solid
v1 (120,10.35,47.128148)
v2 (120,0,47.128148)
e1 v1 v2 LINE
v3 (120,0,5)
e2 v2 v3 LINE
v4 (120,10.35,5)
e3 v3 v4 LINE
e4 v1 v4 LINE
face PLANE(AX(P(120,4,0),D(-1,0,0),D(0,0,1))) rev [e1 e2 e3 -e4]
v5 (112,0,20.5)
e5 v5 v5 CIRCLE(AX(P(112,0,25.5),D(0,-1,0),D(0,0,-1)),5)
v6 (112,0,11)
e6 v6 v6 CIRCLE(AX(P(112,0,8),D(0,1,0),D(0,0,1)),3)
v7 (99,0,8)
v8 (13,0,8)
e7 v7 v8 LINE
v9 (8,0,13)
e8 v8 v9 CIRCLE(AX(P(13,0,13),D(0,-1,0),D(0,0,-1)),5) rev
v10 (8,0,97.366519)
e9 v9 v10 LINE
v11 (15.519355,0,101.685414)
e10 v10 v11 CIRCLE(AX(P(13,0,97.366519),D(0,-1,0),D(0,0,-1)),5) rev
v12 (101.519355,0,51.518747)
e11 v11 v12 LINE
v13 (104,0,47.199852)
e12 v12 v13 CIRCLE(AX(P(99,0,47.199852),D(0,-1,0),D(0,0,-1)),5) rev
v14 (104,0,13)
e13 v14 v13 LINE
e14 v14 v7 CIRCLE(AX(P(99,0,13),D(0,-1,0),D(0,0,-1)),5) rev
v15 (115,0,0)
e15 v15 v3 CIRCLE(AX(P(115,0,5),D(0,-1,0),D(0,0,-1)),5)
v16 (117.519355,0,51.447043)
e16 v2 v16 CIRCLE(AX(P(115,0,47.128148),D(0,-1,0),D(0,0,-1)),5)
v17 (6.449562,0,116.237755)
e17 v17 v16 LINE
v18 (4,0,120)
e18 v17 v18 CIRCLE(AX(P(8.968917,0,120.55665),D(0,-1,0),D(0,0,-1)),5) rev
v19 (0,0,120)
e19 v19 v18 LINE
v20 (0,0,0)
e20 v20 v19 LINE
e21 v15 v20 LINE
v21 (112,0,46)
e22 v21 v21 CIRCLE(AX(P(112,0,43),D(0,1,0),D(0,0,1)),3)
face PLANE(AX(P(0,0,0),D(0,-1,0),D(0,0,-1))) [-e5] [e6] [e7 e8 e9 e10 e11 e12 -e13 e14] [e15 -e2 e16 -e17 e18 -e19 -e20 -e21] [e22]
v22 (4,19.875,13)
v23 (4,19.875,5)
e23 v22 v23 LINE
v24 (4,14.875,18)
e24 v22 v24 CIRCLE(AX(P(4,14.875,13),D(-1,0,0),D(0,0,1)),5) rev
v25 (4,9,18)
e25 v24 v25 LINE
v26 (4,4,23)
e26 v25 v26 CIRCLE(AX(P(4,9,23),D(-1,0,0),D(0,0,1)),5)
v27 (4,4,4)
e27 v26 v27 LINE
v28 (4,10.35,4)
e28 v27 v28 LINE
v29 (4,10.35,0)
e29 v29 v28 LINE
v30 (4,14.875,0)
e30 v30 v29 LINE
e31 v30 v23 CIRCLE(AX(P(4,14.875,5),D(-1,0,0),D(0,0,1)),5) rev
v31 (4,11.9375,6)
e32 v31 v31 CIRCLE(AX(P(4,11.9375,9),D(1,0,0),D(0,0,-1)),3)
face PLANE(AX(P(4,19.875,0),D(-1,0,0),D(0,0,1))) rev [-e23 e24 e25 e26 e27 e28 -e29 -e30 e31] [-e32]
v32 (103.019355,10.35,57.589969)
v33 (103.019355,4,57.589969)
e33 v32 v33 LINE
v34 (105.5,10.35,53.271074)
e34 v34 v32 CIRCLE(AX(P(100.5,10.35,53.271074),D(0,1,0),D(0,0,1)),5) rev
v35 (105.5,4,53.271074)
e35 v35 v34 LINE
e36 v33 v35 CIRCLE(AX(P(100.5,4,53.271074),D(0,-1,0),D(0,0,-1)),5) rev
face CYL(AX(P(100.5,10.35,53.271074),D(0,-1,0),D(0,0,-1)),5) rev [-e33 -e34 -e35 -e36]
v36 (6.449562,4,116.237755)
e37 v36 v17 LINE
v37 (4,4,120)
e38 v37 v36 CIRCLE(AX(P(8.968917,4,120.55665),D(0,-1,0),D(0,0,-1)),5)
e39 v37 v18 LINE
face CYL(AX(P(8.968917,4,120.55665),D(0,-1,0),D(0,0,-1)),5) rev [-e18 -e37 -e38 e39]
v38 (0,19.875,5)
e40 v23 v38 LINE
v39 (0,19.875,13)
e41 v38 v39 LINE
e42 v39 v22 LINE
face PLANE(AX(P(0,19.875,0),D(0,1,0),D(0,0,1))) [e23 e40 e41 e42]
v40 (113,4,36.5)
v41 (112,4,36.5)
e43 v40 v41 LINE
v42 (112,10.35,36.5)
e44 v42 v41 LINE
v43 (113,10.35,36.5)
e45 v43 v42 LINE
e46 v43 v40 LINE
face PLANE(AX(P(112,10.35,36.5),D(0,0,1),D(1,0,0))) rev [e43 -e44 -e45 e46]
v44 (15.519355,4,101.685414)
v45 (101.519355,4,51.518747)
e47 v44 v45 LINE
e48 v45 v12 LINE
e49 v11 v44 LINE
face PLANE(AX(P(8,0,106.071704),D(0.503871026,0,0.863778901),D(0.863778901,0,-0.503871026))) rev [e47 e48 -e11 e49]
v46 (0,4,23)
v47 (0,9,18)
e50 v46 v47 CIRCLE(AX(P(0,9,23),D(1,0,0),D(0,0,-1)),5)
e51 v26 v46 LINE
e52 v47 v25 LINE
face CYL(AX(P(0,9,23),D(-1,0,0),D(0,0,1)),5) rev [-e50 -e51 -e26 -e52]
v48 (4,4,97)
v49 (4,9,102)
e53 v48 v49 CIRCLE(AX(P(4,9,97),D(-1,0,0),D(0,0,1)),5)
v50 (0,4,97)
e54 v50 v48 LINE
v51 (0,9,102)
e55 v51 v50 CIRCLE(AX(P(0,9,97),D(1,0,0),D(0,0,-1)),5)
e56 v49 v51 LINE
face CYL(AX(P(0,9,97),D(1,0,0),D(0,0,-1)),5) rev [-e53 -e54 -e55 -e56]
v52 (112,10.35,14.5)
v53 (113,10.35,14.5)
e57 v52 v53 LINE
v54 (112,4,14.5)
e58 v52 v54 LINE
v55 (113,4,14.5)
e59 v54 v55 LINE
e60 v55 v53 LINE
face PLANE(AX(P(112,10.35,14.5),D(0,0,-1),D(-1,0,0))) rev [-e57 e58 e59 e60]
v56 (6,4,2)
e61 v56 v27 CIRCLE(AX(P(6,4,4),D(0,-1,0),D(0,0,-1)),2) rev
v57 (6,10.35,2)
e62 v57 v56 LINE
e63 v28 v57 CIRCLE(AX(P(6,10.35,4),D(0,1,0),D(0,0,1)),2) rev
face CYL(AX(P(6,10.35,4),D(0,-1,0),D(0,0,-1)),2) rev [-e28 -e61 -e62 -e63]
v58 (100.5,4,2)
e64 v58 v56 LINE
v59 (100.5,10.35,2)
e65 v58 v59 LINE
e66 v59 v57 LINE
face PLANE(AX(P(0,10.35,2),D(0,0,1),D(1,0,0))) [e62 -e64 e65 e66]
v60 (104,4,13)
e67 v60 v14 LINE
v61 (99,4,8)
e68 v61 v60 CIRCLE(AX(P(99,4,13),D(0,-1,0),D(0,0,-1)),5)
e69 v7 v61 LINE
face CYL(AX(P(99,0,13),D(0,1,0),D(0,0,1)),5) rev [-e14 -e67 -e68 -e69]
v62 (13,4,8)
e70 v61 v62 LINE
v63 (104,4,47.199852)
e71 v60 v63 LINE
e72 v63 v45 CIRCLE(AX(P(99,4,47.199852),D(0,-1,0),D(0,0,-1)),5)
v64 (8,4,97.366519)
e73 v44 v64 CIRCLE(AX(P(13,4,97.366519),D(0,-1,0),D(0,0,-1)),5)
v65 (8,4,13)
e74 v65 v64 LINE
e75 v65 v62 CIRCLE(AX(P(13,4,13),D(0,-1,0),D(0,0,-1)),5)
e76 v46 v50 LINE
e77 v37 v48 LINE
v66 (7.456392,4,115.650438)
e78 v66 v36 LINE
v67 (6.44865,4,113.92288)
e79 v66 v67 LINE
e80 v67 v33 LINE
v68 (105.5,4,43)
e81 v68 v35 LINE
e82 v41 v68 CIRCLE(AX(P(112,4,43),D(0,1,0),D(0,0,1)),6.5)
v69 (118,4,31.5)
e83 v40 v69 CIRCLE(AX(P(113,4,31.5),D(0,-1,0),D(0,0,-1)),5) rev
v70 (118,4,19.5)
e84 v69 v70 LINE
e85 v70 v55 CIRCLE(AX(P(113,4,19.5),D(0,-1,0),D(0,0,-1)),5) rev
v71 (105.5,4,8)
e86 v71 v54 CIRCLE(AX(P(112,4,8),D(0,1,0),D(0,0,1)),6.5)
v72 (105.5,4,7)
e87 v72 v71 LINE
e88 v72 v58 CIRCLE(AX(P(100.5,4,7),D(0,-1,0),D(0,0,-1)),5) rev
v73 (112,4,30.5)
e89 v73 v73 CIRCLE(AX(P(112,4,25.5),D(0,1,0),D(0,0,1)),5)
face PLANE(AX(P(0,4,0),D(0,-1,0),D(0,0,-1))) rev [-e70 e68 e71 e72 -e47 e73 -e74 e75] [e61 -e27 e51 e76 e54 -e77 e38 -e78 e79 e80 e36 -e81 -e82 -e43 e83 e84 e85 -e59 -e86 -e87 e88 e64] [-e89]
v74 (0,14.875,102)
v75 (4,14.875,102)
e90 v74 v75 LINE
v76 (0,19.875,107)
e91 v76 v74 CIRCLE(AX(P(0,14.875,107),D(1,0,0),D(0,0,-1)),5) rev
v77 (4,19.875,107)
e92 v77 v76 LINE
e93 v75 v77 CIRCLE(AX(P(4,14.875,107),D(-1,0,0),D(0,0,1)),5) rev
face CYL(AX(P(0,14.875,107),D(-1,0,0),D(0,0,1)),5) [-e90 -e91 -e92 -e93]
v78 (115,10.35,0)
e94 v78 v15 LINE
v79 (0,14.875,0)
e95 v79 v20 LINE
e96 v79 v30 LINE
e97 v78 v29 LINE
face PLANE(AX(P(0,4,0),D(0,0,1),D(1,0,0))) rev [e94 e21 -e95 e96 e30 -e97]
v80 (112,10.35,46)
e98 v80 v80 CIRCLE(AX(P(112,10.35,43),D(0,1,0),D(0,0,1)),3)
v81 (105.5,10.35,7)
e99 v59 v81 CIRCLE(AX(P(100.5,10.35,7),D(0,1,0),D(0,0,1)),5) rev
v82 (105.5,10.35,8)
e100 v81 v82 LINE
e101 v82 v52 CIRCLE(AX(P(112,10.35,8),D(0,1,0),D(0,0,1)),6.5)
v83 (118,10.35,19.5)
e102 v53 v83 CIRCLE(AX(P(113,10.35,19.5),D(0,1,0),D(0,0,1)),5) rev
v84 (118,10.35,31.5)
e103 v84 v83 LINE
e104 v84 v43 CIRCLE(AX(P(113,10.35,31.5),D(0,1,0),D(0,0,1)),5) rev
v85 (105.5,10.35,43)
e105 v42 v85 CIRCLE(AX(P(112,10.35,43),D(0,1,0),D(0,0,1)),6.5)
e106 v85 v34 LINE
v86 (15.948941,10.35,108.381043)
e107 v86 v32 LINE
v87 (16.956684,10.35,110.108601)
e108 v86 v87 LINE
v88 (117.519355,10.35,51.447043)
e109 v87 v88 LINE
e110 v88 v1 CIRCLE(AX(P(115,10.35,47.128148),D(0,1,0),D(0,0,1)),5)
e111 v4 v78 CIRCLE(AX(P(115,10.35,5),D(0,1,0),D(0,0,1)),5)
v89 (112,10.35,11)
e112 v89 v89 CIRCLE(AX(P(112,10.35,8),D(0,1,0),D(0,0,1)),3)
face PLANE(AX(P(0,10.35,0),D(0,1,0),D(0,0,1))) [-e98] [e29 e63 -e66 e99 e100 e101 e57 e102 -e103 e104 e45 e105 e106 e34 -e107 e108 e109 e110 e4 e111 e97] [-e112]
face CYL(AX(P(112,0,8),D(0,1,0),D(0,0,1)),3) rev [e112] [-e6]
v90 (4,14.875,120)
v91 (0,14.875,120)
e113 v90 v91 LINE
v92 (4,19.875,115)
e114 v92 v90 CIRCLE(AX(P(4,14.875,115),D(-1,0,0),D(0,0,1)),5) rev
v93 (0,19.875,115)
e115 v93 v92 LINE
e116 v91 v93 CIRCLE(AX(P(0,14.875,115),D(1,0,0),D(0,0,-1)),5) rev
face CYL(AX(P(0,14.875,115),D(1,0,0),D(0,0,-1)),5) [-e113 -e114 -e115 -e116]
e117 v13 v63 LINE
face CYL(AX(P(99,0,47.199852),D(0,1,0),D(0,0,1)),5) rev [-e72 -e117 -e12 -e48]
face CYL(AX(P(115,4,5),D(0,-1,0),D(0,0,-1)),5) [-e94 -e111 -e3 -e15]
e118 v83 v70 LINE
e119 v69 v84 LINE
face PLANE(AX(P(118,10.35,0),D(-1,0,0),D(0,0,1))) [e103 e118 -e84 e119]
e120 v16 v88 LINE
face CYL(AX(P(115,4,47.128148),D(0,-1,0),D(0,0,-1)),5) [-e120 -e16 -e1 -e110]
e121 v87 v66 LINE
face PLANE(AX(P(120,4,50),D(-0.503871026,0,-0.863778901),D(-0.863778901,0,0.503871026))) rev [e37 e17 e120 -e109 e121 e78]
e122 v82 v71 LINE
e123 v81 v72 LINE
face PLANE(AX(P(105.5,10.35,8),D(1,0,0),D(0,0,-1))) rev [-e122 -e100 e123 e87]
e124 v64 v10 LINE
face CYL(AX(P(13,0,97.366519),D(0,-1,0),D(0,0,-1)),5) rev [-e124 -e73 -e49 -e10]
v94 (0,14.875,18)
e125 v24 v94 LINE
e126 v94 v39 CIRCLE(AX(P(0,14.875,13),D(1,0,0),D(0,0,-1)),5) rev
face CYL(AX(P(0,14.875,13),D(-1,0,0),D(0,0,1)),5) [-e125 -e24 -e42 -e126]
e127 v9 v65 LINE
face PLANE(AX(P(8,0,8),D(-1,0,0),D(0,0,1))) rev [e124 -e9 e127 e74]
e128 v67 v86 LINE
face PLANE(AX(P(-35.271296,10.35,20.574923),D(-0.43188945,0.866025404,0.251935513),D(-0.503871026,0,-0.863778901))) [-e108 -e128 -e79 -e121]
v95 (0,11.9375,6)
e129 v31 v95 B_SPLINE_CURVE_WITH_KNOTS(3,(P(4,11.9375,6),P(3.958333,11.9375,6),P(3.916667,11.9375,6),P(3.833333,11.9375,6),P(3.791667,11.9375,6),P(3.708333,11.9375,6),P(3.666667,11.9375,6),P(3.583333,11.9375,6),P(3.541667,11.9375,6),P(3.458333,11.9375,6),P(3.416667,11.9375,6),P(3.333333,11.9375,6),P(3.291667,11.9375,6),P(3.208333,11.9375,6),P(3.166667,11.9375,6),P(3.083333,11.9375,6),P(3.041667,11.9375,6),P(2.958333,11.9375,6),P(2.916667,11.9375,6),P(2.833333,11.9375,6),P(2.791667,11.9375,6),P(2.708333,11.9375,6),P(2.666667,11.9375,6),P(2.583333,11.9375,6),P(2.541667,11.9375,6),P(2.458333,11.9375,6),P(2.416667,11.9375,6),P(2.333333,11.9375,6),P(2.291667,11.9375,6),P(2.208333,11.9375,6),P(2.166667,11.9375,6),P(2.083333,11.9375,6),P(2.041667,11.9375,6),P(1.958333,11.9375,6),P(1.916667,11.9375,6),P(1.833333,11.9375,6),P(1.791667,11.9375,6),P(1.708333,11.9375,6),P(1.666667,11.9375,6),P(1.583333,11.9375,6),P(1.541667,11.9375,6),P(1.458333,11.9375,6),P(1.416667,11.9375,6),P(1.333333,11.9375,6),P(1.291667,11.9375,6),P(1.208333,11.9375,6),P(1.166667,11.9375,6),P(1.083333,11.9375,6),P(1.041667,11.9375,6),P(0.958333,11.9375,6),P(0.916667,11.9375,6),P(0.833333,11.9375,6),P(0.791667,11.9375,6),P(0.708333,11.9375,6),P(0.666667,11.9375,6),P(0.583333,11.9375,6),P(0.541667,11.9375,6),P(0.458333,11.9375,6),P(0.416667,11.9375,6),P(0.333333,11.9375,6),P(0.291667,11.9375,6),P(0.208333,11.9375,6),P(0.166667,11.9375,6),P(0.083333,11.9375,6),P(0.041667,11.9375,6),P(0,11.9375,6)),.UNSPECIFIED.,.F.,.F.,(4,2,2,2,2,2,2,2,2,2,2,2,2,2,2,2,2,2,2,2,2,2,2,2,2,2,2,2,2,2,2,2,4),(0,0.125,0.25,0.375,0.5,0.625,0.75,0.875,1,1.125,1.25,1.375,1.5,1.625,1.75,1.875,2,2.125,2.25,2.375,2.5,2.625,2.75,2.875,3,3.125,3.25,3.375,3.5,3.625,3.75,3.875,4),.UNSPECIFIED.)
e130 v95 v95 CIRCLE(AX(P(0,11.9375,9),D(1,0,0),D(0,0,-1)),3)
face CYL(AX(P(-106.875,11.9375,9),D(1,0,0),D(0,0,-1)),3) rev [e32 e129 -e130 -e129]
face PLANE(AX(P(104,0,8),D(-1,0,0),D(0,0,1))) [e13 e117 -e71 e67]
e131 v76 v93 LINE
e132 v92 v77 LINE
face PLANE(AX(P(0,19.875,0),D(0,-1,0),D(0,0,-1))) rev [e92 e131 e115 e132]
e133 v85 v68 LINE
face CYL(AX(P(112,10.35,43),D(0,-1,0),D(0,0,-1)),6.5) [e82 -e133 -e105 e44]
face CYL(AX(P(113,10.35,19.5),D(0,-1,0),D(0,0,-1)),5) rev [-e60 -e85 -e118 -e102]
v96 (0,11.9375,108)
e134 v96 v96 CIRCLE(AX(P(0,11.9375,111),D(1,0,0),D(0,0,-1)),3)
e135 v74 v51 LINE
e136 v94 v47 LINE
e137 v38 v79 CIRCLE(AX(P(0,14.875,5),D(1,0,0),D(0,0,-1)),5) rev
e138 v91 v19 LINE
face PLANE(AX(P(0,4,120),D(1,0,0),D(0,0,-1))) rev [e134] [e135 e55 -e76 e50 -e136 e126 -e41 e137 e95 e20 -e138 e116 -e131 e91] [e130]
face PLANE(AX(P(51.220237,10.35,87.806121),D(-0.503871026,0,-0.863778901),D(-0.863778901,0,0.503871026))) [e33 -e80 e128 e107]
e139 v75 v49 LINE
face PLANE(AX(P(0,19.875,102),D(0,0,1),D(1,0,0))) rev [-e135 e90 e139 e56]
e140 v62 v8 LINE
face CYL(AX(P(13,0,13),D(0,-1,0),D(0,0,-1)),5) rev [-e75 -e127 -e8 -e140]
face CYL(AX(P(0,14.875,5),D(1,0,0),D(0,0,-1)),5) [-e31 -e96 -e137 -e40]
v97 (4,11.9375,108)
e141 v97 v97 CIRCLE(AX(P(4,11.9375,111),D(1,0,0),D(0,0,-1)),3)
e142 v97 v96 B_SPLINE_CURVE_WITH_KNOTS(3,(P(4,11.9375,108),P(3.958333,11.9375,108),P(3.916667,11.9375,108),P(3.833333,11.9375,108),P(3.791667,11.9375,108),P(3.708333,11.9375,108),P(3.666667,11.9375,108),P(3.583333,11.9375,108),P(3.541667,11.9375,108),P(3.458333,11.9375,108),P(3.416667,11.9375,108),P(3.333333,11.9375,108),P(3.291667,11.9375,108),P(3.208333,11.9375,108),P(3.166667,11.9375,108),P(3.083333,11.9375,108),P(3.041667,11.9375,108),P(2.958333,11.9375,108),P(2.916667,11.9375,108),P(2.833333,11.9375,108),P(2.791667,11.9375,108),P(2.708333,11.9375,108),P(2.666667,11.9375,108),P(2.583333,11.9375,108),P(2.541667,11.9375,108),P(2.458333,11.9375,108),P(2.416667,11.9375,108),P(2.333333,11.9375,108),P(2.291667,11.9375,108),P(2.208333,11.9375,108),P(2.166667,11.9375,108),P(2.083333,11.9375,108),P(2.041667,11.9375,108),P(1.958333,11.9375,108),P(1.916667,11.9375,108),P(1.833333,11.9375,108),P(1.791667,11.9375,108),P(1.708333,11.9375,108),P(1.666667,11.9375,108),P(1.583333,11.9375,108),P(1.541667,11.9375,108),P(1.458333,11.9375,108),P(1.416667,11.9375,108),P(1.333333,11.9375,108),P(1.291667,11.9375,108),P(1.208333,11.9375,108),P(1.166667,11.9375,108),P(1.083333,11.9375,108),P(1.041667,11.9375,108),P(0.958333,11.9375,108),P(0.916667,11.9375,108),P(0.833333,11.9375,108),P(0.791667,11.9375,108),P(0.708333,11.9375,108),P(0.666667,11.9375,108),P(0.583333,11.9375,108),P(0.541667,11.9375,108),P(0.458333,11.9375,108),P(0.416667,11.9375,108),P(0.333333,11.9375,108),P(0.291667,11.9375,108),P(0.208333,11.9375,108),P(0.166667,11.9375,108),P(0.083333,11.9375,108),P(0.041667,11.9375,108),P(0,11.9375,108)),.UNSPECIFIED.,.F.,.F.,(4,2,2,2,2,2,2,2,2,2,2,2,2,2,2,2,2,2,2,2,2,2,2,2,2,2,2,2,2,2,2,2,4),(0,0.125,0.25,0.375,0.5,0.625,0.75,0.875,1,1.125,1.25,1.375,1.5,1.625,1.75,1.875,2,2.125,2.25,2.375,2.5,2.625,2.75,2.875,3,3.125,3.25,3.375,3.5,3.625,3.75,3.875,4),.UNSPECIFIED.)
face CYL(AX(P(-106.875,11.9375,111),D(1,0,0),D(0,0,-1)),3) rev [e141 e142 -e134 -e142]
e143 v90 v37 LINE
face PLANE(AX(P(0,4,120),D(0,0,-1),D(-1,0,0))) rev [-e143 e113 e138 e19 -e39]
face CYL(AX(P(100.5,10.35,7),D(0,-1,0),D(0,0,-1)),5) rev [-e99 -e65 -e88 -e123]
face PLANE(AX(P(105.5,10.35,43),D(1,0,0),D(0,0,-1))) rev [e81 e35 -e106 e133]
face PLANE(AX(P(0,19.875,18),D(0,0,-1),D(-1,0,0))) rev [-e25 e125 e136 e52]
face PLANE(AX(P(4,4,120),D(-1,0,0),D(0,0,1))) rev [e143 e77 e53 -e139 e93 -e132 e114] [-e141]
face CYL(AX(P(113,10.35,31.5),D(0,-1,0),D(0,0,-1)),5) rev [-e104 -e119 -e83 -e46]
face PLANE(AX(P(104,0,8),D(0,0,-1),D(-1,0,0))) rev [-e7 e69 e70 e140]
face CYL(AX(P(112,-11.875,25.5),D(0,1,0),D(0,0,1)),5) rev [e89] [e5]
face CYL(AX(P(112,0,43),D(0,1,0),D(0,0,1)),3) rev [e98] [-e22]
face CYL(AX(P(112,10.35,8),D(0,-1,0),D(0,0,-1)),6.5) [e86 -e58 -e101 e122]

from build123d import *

# Parameters (mm, degrees)
BOSS_EXTRUDE1_DEPTH = 4
SKETCH2_R           = 3
CUT_EXTRUDE3_DEPTH  = 170.752761391
BOSS_EXTRUDE3_DEPTH = 6.35
CHAMFER1_SIZE       = 8.660254038
CHAMFER1_SIZE_2     = 15
BOSS_EXTRUDE4_START = 6.35
SKETCH8_R           = 3
BOSS_EXTRUDE4_DEPTH = 6.35
SKETCH9_W           = 4
SKETCH9_H           = 18
BOSS_EXTRUDE5_DEPTH = 15.875
SKETCH10_R          = 3
CUT_EXTRUDE4_DEPTH  = 110.875
FILLET3_R           = 5
SKETCH11_R          = 5
CUT_EXTRUDE5_DEPTH  = 15.875
FILLET4_R           = 2


with BuildPart() as part:
    # Sketch1 → Boss-Extrude1 (new body)
    with BuildSketch(Plane(origin=(0, 0, 0), x_dir=(1, 0, 0), z_dir=(0, 1, 0))):
        Polygon((0, 0), (120, 0), (120, -50), (4, -117.666666667), (4, -120), (0, -120), align=None)
    extrude(amount=BOSS_EXTRUDE1_DEPTH)

    # Sketch2 → Cut-Extrude3 (cut, through all)
    with BuildSketch(Plane(origin=(0, 4, 0), x_dir=(1, 0, 0), z_dir=(0, 1, 0))):
        with Locations(Location((112, -8, 0), (0, 0, 270))):
            Circle(SKETCH2_R)
        with Locations(Location((112, -43, 0), (0, 0, 270))):
            Circle(SKETCH2_R)
        Polygon((104, -8), (104, -50.071704007), (8, -106.071704007), (8, -8), align=None)
    extrude(amount=-CUT_EXTRUDE3_DEPTH, mode=Mode.SUBTRACT)

    # Sketch7 → Boss-Extrude3 (add)
    with BuildSketch(Plane(origin=(0, 4, 0), x_dir=(1, 0, 0), z_dir=(0, 1, 0))):
        Polygon((118, -48.851259335), (2.992257949, -115.939108865), (4, -117.666666667), (120, -50), (120, 0), (2.992257949, 0), (2.992257949, -2), (118, -2), align=None)
    extrude(amount=BOSS_EXTRUDE3_DEPTH)

    # Chamfer1
    # the kernel refuses this chamfer: 15, 8.660254038 mm, written as the material it takes off along each edge
    with BuildSketch(Plane(origin=(-16.561105336, 10.35, 82.41905752), x_dir=(0, -1, 0), z_dir=(0.5038710255240854, 0, 0.863778900898434))) as chamfer1_piece_1_section:
        Polygon((CHAMFER1_SIZE, 0), (0, CHAMFER1_SIZE_2), (0, 0), align=None)
    chamfer1_piece_1 = extrude(amount=79.612572639, mode=Mode.PRIVATE)
    chamfer1_piece_1 = split(chamfer1_piece_1, bisect_by=Plane(origin=(-16.561105336, 4, 82.41905752), z_dir=(0, 1, 0)), keep=Keep.TOP, mode=Mode.PRIVATE)
    add(chamfer1_piece_1, mode=Mode.SUBTRACT)

    # Sketch8 → Boss-Extrude4 (add)
    # profile 1 of 2: a face of its own
    with BuildSketch(Plane(origin=(0, 4, 0), x_dir=(1, 0, 0), z_dir=(0, 1, 0)).offset(BOSS_EXTRUDE4_START)):
        with BuildLine():
            Line((112, -14.5), (118, -14.5))
            Line((118, -14.5), (118, -2))
            Line((118, -2), (105.5, -2))
            Line((105.5, -2), (105.5, -8))
            ThreePointArc((105.5, -8), (107.403805922, -12.596194078), (112, -14.5))
        make_face()
        with Locations(Location((112, -8, 0), (0, 0, 270))):
            Circle(SKETCH8_R, mode=Mode.SUBTRACT)
    # profile 2 of 2: a face of its own
    with BuildSketch(Plane(origin=(0, 4, 0), x_dir=(1, 0, 0), z_dir=(0, 1, 0)).offset(BOSS_EXTRUDE4_START)):
        with BuildLine():
            Line((112, -36.5), (118, -36.5))
            Line((118, -36.5), (118, -48.851259335))
            Line((118, -48.851259335), (105.5, -56.142926002))
            Line((105.5, -56.142926002), (105.5, -43))
            ThreePointArc((105.5, -43), (107.403805922, -38.403805922), (112, -36.5))
        make_face()
        with Locations(Location((112, -43, 0), (0, 0, 270))):
            Circle(SKETCH8_R, mode=Mode.SUBTRACT)
    extrude(amount=-BOSS_EXTRUDE4_DEPTH)

    # Sketch9 → Boss-Extrude5 (add)
    with BuildSketch(Plane(origin=(0, 4, 0), x_dir=(1, 0, 0), z_dir=(0, 1, 0))):
        with Locations((2, -9)):
            Rectangle(SKETCH9_W, SKETCH9_H)
        with Locations((2, -111)):
            Rectangle(SKETCH9_W, SKETCH9_H)
    extrude(amount=BOSS_EXTRUDE5_DEPTH)

    # Sketch10 → Cut-Extrude4 (cut)
    with BuildSketch(Plane(origin=(4, 0, 0), x_dir=(0, 0, -1), z_dir=(1, 0, 0))):
        with Locations((-9, 11.9375)):
            Circle(SKETCH10_R)
        with Locations((-111, 11.9375)):
            Circle(SKETCH10_R)
    extrude(amount=-CUT_EXTRUDE4_DEPTH, mode=Mode.SUBTRACT)

    # Fillet3
    # the kernel refuses this fillet: 5 mm, written as the material it adds along each edge
    with BuildSketch(Plane(origin=(105.5, 10.35, 56.142926002), x_dir=(-0.863778900898437, 0, 0.50387102552408), z_dir=(0, -1, 0))) as fillet3_piece_1:
        with BuildLine():
            CenterArc((FILLET3_R * 0.574370332454, FILLET3_R), FILLET3_R, 210.256437164, 59.743562836)
            Line((-FILLET3_R * 0.289408568444, FILLET3_R * 0.496128974476), (0, 0))
            Line((0, 0), (FILLET3_R * 0.574370332454, 0))
        make_face()
    extrude(amount=6.35)
    with BuildSketch(Plane(origin=(118, 10.35, 36.5), x_dir=(-1, 0, 0), z_dir=(0, -1, 0))) as fillet3_piece_2:
        with BuildLine():
            CenterArc((FILLET3_R, FILLET3_R), FILLET3_R, 180, 90)
            Line((0, FILLET3_R), (0, 0))
            Line((0, 0), (FILLET3_R, 0))
        make_face()
    extrude(amount=6.35)
    with BuildSketch(Plane(origin=(118, 10.35, 14.5), x_dir=(-1, 0, 0), z_dir=(0, -1, 0)), Plane(origin=(105.5, 10.35, 2), x_dir=(-1, 0, 0), z_dir=(0, -1, 0))) as fillet3_piece_3:
        with BuildLine():
            CenterArc((FILLET3_R, -FILLET3_R), FILLET3_R, 90, 90)
            Line((0, -FILLET3_R), (0, 0))
            Line((0, 0), (FILLET3_R, 0))
        make_face()
    extrude(amount=6.35)
    with BuildSketch(Plane(origin=(4, 0, 117.666666667), x_dir=(0.863778900898435, 0, -0.5038710255240835), z_dir=(0, 1, 0))) as fillet3_piece_4:
        with BuildLine():
            CenterArc((2.835867325, -5), FILLET3_R, 90, 53.351575298)
            Line((-1.17569906, -2.015484102), (0, 0))
            Line((0, 0), (2.835867325, 0))
        make_face()
    extrude(amount=4)
    with BuildSketch(Plane(origin=(8, 4, 106.071704007), x_dir=(0.8637789008984339, 0, -0.5038710255240852), z_dir=(0, -1, 0))) as fillet3_piece_5:
        with BuildLine():
            CenterArc((FILLET3_R * 1.74103699912, -FILLET3_R), FILLET3_R, 90, 120.256437164)
            Line((FILLET3_R * 0.877258098222, -FILLET3_R * 1.50387102552), (0, 0))
            Line((0, 0), (FILLET3_R * 1.74103699912, 0))
        make_face()
    extrude(amount=4)
    with BuildSketch(Plane(origin=(104, 4, 50.071704007), x_dir=(-0.8637789008984337, 0, 0.5038710255240859), z_dir=(0, -1, 0))) as fillet3_piece_6:
        with BuildLine():
            CenterArc((FILLET3_R * 0.574370332454, FILLET3_R), FILLET3_R, 210.256437164, 59.743562836)
            Line((-FILLET3_R * 0.289408568444, FILLET3_R * 0.496128974476), (0, 0))
            Line((0, 0), (FILLET3_R * 0.574370332454, 0))
        make_face()
    extrude(amount=4)
    with BuildSketch(Plane(origin=(104, 4, 8), x_dir=(-1, 0, 0), z_dir=(0, -1, 0)), Plane(origin=(8, 4, 8), x_dir=(0, 0, 1), z_dir=(0, -1, 0))) as fillet3_piece_7:
        with BuildLine():
            CenterArc((FILLET3_R, -FILLET3_R), FILLET3_R, 90, 90)
            Line((0, -FILLET3_R), (0, 0))
            Line((0, 0), (FILLET3_R, 0))
        make_face()
    extrude(amount=4)
    with BuildSketch(Plane(origin=(4, 4, 102), x_dir=(0, 1, 0), z_dir=(-1, 0, 0)), Plane(origin=(4, 4, 18), x_dir=(0, 0, 1), z_dir=(-1, 0, 0))) as fillet3_piece_8:
        with BuildLine():
            CenterArc((FILLET3_R, FILLET3_R), FILLET3_R, 180, 90)
            Line((0, FILLET3_R), (0, 0))
            Line((0, 0), (FILLET3_R, 0))
        make_face()
    extrude(amount=4)
    # the kernel refuses this fillet: 5 mm, written as the material it takes off along each edge
    with BuildSketch(Plane(origin=(120, 22.85, 0), x_dir=(-1, 0, 0), z_dir=(0, -1, 0))) as fillet3_2_piece_1:
        with BuildLine():
            CenterArc((FILLET3_R, -FILLET3_R), FILLET3_R, 90, 90)
            Line((0, -FILLET3_R), (0, 0))
            Line((0, 0), (FILLET3_R, 0))
        make_face()
    extrude(amount=35.35, mode=Mode.SUBTRACT)
    with BuildSketch(Plane(origin=(120, 17.529629156, 50), x_dir=(0, 0, -1), z_dir=(0, -1, 0))) as fillet3_2_piece_2:
        with BuildLine():
            CenterArc((FILLET3_R * 0.574370332454, -FILLET3_R), FILLET3_R, 90, 59.743562836)
            Line((-FILLET3_R * 0.289408568444, -FILLET3_R * 0.496128974476), (0, 0))
            Line((0, 0), (FILLET3_R * 0.574370332454, 0))
        make_face()
    extrude(amount=24.709258311, mode=Mode.SUBTRACT)
    with BuildSketch(Plane(origin=(-12.5, 19.875, 120), x_dir=(0, 0, -1), z_dir=(1, 0, 0)), Plane(origin=(-12.5, 19.875, 0), x_dir=(0, -1, 0), z_dir=(1, 0, 0)), Plane(origin=(16.5, 19.875, 18), x_dir=(0, -1, 0), z_dir=(-1, 0, 0))) as fillet3_2_piece_3:
        with BuildLine():
            CenterArc((FILLET3_R, -FILLET3_R), FILLET3_R, 90, 90)
            Line((0, -FILLET3_R), (0, 0))
            Line((0, 0), (FILLET3_R, 0))
        make_face()
    extrude(amount=29, mode=Mode.SUBTRACT)
    with BuildSketch(Plane(origin=(16.5, 19.875, 102), x_dir=(0, -1, 0), z_dir=(-1, 0, 0))) as fillet3_2_piece_4:
        with BuildLine():
            CenterArc((FILLET3_R, FILLET3_R), FILLET3_R, 180, 90)
            Line((0, FILLET3_R), (0, 0))
            Line((0, 0), (FILLET3_R, 0))
        make_face()
    extrude(amount=29, mode=Mode.SUBTRACT)

    # Sketch11 → Cut-Extrude5 (cut)
    with BuildSketch(Plane(origin=(0, 4, 0), x_dir=(1, 0, 0), z_dir=(0, 1, 0))):
        with Locations(Location((112, -25.5, 0), (0, 0, 270))):
            Circle(SKETCH11_R)
    extrude(amount=-CUT_EXTRUDE5_DEPTH, mode=Mode.SUBTRACT)

    # Fillet4
    fillet4_edges = [part.edges().sort_by_distance(p)[0] for p in [
        (4, 7.175, 2),
    ]]
    fillet(fillet4_edges, radius=FILLET4_R)


solid = part.part
